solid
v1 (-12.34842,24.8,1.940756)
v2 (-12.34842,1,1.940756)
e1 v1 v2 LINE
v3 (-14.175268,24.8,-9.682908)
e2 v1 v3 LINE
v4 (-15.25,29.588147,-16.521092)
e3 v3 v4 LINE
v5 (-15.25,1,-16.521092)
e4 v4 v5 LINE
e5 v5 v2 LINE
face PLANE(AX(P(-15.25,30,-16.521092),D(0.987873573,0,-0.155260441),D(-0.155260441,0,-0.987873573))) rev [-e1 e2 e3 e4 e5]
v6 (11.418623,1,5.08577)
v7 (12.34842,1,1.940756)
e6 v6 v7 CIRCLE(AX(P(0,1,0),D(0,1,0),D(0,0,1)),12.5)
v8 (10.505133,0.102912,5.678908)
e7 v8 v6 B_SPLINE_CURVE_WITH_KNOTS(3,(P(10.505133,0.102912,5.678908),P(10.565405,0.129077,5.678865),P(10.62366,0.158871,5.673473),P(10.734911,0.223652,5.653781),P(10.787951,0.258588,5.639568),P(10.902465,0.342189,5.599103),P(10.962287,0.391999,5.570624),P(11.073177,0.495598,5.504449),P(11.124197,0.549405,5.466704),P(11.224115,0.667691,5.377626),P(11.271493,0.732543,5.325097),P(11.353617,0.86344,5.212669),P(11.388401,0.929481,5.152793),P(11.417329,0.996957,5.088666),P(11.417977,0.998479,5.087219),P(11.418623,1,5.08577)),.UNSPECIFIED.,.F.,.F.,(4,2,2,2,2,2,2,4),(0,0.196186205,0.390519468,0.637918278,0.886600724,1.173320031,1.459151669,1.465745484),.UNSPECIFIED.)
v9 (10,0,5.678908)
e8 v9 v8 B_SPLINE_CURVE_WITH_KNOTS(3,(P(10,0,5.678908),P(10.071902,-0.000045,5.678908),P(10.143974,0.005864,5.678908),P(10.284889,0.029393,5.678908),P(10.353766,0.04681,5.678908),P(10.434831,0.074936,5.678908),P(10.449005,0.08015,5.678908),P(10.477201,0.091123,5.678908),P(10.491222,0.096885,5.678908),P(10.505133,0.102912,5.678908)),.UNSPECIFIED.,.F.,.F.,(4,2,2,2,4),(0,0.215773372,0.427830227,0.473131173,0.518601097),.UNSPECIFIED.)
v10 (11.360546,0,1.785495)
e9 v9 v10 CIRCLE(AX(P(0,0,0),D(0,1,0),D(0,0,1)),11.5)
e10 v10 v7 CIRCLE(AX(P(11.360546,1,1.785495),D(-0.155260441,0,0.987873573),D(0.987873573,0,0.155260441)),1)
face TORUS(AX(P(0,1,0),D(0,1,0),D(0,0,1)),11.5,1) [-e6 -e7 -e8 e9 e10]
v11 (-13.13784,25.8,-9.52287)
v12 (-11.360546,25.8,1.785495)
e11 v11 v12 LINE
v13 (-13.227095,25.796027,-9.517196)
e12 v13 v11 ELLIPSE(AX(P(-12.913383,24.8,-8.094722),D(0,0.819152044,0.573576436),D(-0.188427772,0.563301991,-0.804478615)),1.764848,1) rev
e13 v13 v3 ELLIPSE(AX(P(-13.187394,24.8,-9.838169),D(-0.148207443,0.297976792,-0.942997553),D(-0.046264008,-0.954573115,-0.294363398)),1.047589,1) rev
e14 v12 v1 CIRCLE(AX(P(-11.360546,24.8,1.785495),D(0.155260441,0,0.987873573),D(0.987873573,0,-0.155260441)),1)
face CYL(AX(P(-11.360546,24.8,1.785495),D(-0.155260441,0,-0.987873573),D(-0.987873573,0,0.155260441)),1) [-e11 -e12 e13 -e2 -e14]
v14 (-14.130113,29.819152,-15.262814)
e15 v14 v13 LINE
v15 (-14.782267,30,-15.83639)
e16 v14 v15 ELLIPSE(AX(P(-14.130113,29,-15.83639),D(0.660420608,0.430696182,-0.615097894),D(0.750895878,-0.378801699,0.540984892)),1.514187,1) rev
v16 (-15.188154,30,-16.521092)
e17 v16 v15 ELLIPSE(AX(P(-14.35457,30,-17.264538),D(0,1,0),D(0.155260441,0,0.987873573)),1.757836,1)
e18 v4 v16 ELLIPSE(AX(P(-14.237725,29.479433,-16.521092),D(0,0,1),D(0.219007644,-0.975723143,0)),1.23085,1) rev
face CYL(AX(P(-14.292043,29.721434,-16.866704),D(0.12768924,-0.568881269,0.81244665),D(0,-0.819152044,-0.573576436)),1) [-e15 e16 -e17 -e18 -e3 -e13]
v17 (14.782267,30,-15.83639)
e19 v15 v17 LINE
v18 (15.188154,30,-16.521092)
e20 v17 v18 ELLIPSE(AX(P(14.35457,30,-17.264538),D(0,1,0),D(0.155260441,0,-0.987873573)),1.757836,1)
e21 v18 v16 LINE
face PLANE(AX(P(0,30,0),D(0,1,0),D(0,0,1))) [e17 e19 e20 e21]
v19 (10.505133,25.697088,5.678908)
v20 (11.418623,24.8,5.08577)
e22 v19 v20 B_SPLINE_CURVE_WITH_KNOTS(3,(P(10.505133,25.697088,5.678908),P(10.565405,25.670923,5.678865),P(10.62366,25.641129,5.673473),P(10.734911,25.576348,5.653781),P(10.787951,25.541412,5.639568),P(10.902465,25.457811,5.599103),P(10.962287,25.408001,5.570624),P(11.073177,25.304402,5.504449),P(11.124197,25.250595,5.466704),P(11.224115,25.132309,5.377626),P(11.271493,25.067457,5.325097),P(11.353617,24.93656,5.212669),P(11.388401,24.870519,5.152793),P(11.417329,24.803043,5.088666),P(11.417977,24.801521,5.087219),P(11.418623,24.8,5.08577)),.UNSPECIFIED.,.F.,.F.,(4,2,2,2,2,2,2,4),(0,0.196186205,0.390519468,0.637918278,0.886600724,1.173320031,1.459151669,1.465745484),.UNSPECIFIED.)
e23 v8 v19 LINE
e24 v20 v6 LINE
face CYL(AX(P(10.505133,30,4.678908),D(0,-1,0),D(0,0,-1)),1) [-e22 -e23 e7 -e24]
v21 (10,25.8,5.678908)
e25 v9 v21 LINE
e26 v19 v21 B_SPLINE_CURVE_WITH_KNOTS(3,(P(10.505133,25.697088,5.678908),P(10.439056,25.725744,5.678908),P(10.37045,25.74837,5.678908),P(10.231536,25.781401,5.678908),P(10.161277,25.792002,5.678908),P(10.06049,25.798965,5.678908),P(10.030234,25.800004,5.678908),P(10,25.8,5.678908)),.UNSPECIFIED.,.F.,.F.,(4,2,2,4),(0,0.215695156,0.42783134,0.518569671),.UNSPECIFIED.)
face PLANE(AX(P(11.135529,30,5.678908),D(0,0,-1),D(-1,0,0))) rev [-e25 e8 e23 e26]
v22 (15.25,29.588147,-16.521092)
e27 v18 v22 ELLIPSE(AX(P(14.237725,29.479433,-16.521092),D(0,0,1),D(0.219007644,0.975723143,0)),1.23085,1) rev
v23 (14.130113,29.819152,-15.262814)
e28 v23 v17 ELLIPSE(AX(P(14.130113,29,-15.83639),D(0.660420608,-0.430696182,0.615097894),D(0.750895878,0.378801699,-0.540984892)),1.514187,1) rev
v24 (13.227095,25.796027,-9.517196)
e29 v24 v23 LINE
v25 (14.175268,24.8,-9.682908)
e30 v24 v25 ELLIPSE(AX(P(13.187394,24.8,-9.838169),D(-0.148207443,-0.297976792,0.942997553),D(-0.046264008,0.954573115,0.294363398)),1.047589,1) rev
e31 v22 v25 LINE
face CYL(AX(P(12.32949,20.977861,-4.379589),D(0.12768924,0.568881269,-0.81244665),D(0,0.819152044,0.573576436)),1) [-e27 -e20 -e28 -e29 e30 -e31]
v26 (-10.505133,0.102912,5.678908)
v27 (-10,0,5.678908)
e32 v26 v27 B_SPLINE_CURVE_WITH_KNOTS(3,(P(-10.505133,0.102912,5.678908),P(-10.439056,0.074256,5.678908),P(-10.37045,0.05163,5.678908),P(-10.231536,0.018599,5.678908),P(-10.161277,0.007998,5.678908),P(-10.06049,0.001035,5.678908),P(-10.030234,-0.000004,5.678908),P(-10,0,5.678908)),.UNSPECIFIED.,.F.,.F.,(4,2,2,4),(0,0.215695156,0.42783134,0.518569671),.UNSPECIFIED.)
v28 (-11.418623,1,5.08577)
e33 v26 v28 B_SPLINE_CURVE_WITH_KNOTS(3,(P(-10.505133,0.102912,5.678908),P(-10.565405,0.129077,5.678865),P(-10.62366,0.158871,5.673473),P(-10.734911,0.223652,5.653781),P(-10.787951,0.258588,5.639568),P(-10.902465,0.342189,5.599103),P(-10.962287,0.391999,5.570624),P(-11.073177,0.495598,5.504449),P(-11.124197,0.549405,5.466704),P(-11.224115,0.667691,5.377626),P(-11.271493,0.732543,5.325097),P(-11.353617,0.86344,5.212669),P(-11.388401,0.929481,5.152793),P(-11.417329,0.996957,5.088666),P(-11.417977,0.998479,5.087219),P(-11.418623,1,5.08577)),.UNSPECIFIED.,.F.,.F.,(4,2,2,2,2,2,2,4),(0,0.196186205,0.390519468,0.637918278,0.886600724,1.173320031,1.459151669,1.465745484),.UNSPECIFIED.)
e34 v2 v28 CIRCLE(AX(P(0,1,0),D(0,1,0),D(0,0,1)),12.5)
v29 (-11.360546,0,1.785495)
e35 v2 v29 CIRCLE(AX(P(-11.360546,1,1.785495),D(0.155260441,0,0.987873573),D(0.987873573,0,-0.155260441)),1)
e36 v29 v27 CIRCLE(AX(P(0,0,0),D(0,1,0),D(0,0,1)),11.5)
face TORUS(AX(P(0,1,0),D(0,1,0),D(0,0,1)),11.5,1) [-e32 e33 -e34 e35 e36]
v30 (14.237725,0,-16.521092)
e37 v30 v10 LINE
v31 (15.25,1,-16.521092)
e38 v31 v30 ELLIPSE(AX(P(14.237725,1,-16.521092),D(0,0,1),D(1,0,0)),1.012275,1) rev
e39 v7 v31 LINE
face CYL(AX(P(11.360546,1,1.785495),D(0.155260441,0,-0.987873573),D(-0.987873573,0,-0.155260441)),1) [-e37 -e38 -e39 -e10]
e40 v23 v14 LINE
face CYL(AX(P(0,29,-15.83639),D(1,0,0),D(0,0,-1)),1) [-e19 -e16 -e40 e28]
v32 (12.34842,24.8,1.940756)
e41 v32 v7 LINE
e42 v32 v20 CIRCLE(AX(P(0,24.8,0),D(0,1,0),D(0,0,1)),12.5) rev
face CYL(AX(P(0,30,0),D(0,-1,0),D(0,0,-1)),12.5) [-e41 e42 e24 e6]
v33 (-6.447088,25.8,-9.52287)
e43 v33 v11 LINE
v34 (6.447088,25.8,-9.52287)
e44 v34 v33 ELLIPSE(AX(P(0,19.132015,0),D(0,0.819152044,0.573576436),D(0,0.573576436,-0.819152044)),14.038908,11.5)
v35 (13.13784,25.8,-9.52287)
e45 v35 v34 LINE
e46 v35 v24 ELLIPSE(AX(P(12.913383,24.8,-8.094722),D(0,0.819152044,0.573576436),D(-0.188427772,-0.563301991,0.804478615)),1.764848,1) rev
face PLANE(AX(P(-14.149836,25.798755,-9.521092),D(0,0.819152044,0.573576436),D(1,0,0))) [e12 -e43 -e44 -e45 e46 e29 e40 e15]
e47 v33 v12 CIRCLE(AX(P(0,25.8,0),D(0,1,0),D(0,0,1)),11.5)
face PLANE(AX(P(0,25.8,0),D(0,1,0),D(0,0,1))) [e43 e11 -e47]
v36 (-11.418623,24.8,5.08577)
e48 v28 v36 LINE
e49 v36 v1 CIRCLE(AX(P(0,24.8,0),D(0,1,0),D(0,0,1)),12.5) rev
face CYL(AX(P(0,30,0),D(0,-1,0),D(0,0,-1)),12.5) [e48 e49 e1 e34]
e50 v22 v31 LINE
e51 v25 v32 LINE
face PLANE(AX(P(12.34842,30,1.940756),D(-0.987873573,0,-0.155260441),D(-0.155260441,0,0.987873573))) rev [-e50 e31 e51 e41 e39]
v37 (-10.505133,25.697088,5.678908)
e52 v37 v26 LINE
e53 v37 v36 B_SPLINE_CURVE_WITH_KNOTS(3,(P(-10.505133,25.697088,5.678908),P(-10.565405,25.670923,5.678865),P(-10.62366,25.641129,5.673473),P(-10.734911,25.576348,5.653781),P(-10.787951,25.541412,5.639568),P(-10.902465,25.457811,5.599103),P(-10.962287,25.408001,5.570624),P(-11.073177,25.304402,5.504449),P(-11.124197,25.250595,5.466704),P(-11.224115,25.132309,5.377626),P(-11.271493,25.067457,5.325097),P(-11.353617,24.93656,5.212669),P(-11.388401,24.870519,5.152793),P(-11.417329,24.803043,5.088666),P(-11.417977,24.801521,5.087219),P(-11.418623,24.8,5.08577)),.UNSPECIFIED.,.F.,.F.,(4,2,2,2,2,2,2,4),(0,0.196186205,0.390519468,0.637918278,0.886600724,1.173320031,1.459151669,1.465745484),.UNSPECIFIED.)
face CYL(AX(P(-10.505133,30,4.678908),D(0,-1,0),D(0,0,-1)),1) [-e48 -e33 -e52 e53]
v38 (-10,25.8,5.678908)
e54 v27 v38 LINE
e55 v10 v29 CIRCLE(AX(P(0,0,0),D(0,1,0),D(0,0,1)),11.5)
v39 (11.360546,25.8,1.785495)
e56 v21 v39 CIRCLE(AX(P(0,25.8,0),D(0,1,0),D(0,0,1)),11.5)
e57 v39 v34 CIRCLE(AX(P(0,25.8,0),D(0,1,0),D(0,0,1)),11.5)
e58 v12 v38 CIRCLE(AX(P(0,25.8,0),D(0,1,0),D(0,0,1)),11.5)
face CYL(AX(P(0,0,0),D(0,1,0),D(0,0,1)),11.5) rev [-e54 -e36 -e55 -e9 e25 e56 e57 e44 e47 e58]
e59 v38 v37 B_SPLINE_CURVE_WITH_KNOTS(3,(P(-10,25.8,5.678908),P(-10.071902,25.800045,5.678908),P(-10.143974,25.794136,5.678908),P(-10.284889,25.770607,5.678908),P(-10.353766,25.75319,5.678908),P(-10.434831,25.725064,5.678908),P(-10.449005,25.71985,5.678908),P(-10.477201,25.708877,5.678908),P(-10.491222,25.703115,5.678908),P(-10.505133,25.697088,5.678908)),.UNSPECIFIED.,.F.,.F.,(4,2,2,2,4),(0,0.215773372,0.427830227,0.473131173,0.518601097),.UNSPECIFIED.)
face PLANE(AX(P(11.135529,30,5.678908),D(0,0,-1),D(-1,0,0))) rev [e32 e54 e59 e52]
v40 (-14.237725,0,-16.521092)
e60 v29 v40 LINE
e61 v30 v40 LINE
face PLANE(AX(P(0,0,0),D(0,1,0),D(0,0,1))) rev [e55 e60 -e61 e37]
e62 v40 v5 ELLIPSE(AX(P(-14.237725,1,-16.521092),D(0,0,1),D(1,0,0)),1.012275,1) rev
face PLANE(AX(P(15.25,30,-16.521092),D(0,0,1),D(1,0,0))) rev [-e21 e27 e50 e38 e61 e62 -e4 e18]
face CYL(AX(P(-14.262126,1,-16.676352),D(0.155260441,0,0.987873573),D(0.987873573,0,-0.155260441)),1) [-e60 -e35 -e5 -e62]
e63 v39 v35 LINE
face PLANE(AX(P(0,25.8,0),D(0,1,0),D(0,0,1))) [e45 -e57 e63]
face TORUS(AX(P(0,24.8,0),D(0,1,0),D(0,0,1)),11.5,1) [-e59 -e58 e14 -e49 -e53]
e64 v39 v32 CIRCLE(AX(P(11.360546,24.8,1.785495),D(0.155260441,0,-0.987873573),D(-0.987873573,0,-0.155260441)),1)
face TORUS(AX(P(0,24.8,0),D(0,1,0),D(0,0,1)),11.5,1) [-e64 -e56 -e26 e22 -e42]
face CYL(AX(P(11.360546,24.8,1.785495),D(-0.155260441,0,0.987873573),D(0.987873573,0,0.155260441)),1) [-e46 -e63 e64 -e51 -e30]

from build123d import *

# Parameters (mm, degrees)
SALIENTE_EXTRUIR1_DEPTH = 30
CORTAR_EXTRUIR1_START   = -4.2
CORTAR_EXTRUIR1_DEPTH   = 4.2
CHAFL_N1_SIZE           = 4.201245229
CHAFL_N1_SIZE_2         = 6
CORTAR_EXTRUIR2_DEPTH   = 38.490118291
REDONDEO1_R             = 1


with BuildPart() as part:
    # Croquis1 → Saliente-Extruir1 (new body)
    with BuildSketch(Plane(origin=(0, 0, 0), x_dir=(1, 0, 0), z_dir=(0, 1, 0))):
        with BuildLine():
            Line((11.135528726, -5.678908346), (-11.135528726, -5.678908346))
            ThreePointArc((-11.135528726, -5.678908346), (-11.889802545, -3.857796709), (-12.348419657, -1.940755517))
            Line((-12.348419657, -1.940755517), (-15.25, 16.521091654))
            Line((-15.25, 16.521091654), (15.25, 16.521091654))
            Line((15.25, 16.521091654), (12.348419657, -1.940755517))
            ThreePointArc((12.348419657, -1.940755517), (11.889802545, -3.857796709), (11.135528726, -5.678908346))
        make_face()
    extrude(amount=SALIENTE_EXTRUIR1_DEPTH)

    # Croquis4 → Cortar-Extruir1 (cut)
    with BuildSketch(Plane(origin=(0, 30, 0), x_dir=(1, 0, 0), z_dir=(0, 1, 0)).offset(CORTAR_EXTRUIR1_START)):
        with BuildLine():
            Line((-14.14983585, 9.521091654), (14.14983585, 9.521091654))
            Line((14.14983585, 9.521091654), (12.348419657, -1.940755517))
            ThreePointArc((12.348419657, -1.940755517), (11.889802545, -3.857796709), (11.135528726, -5.678908346))
            Line((11.135528726, -5.678908346), (-11.135528726, -5.678908346))
            ThreePointArc((-11.135528726, -5.678908346), (-11.889802545, -3.857796709), (-12.348419657, -1.940755517))
            Line((-12.348419657, -1.940755517), (-14.14983585, 9.521091654))
        make_face()
    extrude(amount=CORTAR_EXTRUIR1_DEPTH, mode=Mode.SUBTRACT)

    # Chaflán1
    # the kernel refuses this chamfer: 6, 4.201245229 mm, written as the material it takes off along each edge
    with BuildSketch(Plane(origin=(-29.645149232, 30, -9.521091654), x_dir=(0, -0.9989750717851553, 0.04526373771402067), z_dir=(1, 0, 0))) as chafl_n1_piece_1_section:
        Polygon((CHAFL_N1_SIZE * 0.998975071847, CHAFL_N1_SIZE * 0.0452637377168), (-CHAFL_N1_SIZE_2 * 0.045263737714, CHAFL_N1_SIZE_2 * 0.998975071785), (0, 0), align=None)
    chafl_n1_piece_1 = extrude(amount=59.290298463, mode=Mode.PRIVATE)
    chafl_n1_piece_1 = split(chafl_n1_piece_1, bisect_by=Plane(origin=(0, 25.8, -11.524605635), z_dir=(0, 1, 0)), keep=Keep.TOP, mode=Mode.PRIVATE)
    add(chafl_n1_piece_1, mode=Mode.SUBTRACT)

    # Croquis5 → Cortar-Extruir2 (cut, through all)
    with BuildSketch(Plane(origin=(0, 30, 0), x_dir=(1, 0, 0), z_dir=(0, 1, 0))):
        with BuildLine():
            ThreePointArc((11.5, 0), (-2.936835031, 11.118677979), (-10, -5.678908346))
            Line((-10, -5.678908346), (10, -5.678908346))
            ThreePointArc((10, -5.678908346), (11.118677979, -2.936835031), (11.5, 0))
        make_face()
        with BuildLine():
            Line((10, -5.678908346), (-10, -5.678908346))
            ThreePointArc((-10, -5.678908346), (0, -11.5), (10, -5.678908346))
        make_face()
    extrude(amount=-CORTAR_EXTRUIR2_DEPTH, mode=Mode.SUBTRACT)

    # Redondeo1
    # the kernel refuses this fillet: 1 mm, written as the material it takes off along each edge
    with BuildSketch(Plane(origin=(11.135528726, 0, 5.678908346), x_dir=(0.43073600418276364, 0, -0.9024779746346534), z_dir=(0, 1, 0))) as redondeo1_piece_1:
        with BuildLine():
            CenterArc((0.630943784, 0.999654376), REDONDEO1_R, 205.514277886, 65.992163004)
            Line((-0.27153419, 0.568918372), (-0.28958375, 0.560303652))
            Line((-0.28958375, 0.560303652), (-0.018049559, -0.00861472))
            Line((-0.018049559, -0.00861472), (-0.000525786, -0.019993088))
            ThreePointArc((-0.000525786, -0.019993088), (0.328616554, -0.0243203), (0.657758895, -0.019993088))
            Line((0.657758895, -0.019993088), (0.657233109, 0))
        make_face()
    extrude(amount=25.8, mode=Mode.SUBTRACT)
    with BuildSketch(Plane(origin=(-11.135528726, 0, 5.678908346), x_dir=(-0.43073600418276736, 0, -0.9024779746346517), z_dir=(0, 1, 0))) as redondeo1_piece_2:
        with BuildLine():
            CenterArc((0.630943784, -0.999654376), REDONDEO1_R, 88.493559111, 65.992163004)
            Line((-0.27153419, -0.568918372), (-0.28958375, -0.560303652))
            Line((-0.28958375, -0.560303652), (-0.018049559, 0.00861472))
            Line((-0.018049559, 0.00861472), (-0.000525786, 0.019993088))
            ThreePointArc((-0.000525786, 0.019993088), (0.328616554, 0.0243203), (0.657758895, 0.019993088))
            Line((0.657758895, 0.019993088), (0.657233109, 0))
        make_face()
    extrude(amount=25.8, mode=Mode.SUBTRACT)
    with BuildSketch(Plane(origin=(-15.881080665, 30, -15.521091654), x_dir=(0, -0.573576436351271, 0.8191520442888343), z_dir=(1, 0, 0))) as redondeo1_piece_3_section:
        with BuildLine():
            CenterArc((REDONDEO1_R * 0.315298788879, REDONDEO1_R), REDONDEO1_R, 235, 35)
            Line((-REDONDEO1_R * 0.258277647472, REDONDEO1_R * 0.180847955711), (-REDONDEO1_R * 0.269749176199, REDONDEO1_R * 0.164464914825))
            Line((-REDONDEO1_R * 0.269749176199, REDONDEO1_R * 0.164464914825), (-REDONDEO1_R * 0.00630597577758, -REDONDEO1_R * 0.02))
            Line((-REDONDEO1_R * 0.00630597577758, -REDONDEO1_R * 0.02), (REDONDEO1_R * 0.315298788879, -REDONDEO1_R * 0.02))
            Line((REDONDEO1_R * 0.315298788879, -REDONDEO1_R * 0.02), (REDONDEO1_R * 0.315298788879, 0))
        make_face()
    redondeo1_piece_3 = extrude(amount=31.76216133, mode=Mode.PRIVATE)
    redondeo1_piece_3 = split(redondeo1_piece_3, bisect_by=Plane(origin=(14.730786778, 29.963938904, -13.217500501), z_dir=(-0.9878735725575741, 0, -0.1552604413311243)), keep=Keep.TOP, mode=Mode.PRIVATE)
    redondeo1_piece_3 = split(redondeo1_piece_3, bisect_by=Plane(origin=(-14.730786778, 29.963938904, -13.217500501), z_dir=(0.9878735725575741, 0, -0.1552604413311243)), keep=Keep.TOP, mode=Mode.PRIVATE)
    add(redondeo1_piece_3, mode=Mode.SUBTRACT)
    with BuildSketch(Plane(origin=(0, 0, 0), x_dir=(-0.7828247498801871, 0, 0.622242244608177), z_dir=(0.622242244608177, 0, 0.7828247498801871))) as redondeo1_piece_4_section:
        with BuildLine():
            CenterArc((12.5 - REDONDEO1_R, -REDONDEO1_R), REDONDEO1_R, 0, 90)
            Line((12.5, -REDONDEO1_R), (12.5 + REDONDEO1_R * 0.02, -REDONDEO1_R))
            Line((12.5 + REDONDEO1_R * 0.02, -REDONDEO1_R), (12.5 + REDONDEO1_R * 0.02, REDONDEO1_R * 0.02))
            Line((12.5 + REDONDEO1_R * 0.02, REDONDEO1_R * 0.02), (12.5 - REDONDEO1_R, REDONDEO1_R * 0.02))
            Line((12.5 - REDONDEO1_R, REDONDEO1_R * 0.02), (12.5 - REDONDEO1_R, 0))
        make_face()
    redondeo1_piece_4 = revolve(axis=Axis((0, 0, 0), (0, -1, 0)), revolution_arc=29.548159275, mode=Mode.PRIVATE)
    redondeo1_piece_4 = split(redondeo1_piece_4, bisect_by=Plane(origin=(-11.602574927, 0.225035128, 5.678908346), z_dir=(0, 0, -1)), keep=Keep.TOP, mode=Mode.PRIVATE)
    add(redondeo1_piece_4, mode=Mode.SUBTRACT)
    with BuildSketch(Plane(origin=(0, 25.8, 0), x_dir=(-0.7828247498801902, 0, 0.6222422446081731), z_dir=(0.6222422446081731, 0, 0.7828247498801902))) as redondeo1_piece_5_section:
        with BuildLine():
            CenterArc((12.5 - REDONDEO1_R, REDONDEO1_R), REDONDEO1_R, 270, 90)
            Line((12.5 - REDONDEO1_R, 0), (12.5 - REDONDEO1_R, -REDONDEO1_R * 0.02))
            Line((12.5 - REDONDEO1_R, -REDONDEO1_R * 0.02), (12.5 + REDONDEO1_R * 0.02, -REDONDEO1_R * 0.02))
            Line((12.5 + REDONDEO1_R * 0.02, -REDONDEO1_R * 0.02), (12.5 + REDONDEO1_R * 0.02, REDONDEO1_R))
            Line((12.5 + REDONDEO1_R * 0.02, REDONDEO1_R), (12.5, REDONDEO1_R))
        make_face()
    redondeo1_piece_5 = revolve(axis=Axis((0, 25.8, 0), (0, -1, 0)), revolution_arc=29.548159275, mode=Mode.PRIVATE)
    redondeo1_piece_5 = split(redondeo1_piece_5, bisect_by=Plane(origin=(-11.60257492, 25.57496487, 5.678908346), z_dir=(0, 0, -1)), keep=Keep.TOP, mode=Mode.PRIVATE)
    add(redondeo1_piece_5, mode=Mode.SUBTRACT)
    with BuildSketch(Plane(origin=(0, 0, 0), x_dir=(0.9878735725575738, 0, 0.1552604413311257), z_dir=(0.1552604413311257, 0, -0.9878735725575738))) as redondeo1_piece_6_section:
        with BuildLine():
            CenterArc((12.5 - REDONDEO1_R, -REDONDEO1_R), REDONDEO1_R, 0, 90)
            Line((12.5 - REDONDEO1_R, 0), (12.5 - REDONDEO1_R, REDONDEO1_R * 0.02))
            Line((12.5 - REDONDEO1_R, REDONDEO1_R * 0.02), (12.5 + REDONDEO1_R * 0.02, REDONDEO1_R * 0.02))
            Line((12.5 + REDONDEO1_R * 0.02, REDONDEO1_R * 0.02), (12.5 + REDONDEO1_R * 0.02, -REDONDEO1_R))
            Line((12.5 + REDONDEO1_R * 0.02, -REDONDEO1_R), (12.5, -REDONDEO1_R))
        make_face()
    redondeo1_piece_6 = revolve(axis=Axis((0, 0, 0), (0, -1, 0)), revolution_arc=29.548159275, mode=Mode.PRIVATE)
    redondeo1_piece_6 = split(redondeo1_piece_6, bisect_by=Plane(origin=(11.602574265, 0.22503504, 5.678908346), z_dir=(0, 0, -1)), keep=Keep.TOP, mode=Mode.PRIVATE)
    add(redondeo1_piece_6, mode=Mode.SUBTRACT)
    with BuildSketch(Plane(origin=(0, 25.8, 0), x_dir=(0.9878735725575738, 0, 0.155260441331126), z_dir=(0.155260441331126, 0, -0.9878735725575738))) as redondeo1_piece_7_section:
        with BuildLine():
            CenterArc((12.5 - REDONDEO1_R, REDONDEO1_R), REDONDEO1_R, 270, 90)
            Line((12.5 - REDONDEO1_R, 0), (12.5 - REDONDEO1_R, -REDONDEO1_R * 0.02))
            Line((12.5 - REDONDEO1_R, -REDONDEO1_R * 0.02), (12.5 + REDONDEO1_R * 0.02, -REDONDEO1_R * 0.02))
            Line((12.5 + REDONDEO1_R * 0.02, -REDONDEO1_R * 0.02), (12.5 + REDONDEO1_R * 0.02, REDONDEO1_R))
            Line((12.5 + REDONDEO1_R * 0.02, REDONDEO1_R), (12.5, REDONDEO1_R))
        make_face()
    redondeo1_piece_7 = revolve(axis=Axis((0, 25.8, 0), (0, -1, 0)), revolution_arc=29.548159275, mode=Mode.PRIVATE)
    redondeo1_piece_7 = split(redondeo1_piece_7, bisect_by=Plane(origin=(11.602574265, 25.57496496, 5.678908346), z_dir=(0, 0, -1)), keep=Keep.TOP, mode=Mode.PRIVATE)
    add(redondeo1_piece_7, mode=Mode.SUBTRACT)
    with BuildSketch(Plane(origin=(-12.348419657, 0, 1.940755517), x_dir=(0.987873572557574, 0, -0.15526044133112427), z_dir=(-0.1552604413311243, 0, -0.9878735725575741))) as redondeo1_piece_8_section:
        with BuildLine():
            CenterArc((REDONDEO1_R, -REDONDEO1_R), REDONDEO1_R, 90, 90)
            Line((0, -REDONDEO1_R), (-REDONDEO1_R * 0.02, -REDONDEO1_R))
            Line((-REDONDEO1_R * 0.02, -REDONDEO1_R), (-REDONDEO1_R * 0.02, REDONDEO1_R * 0.02))
            Line((-REDONDEO1_R * 0.02, REDONDEO1_R * 0.02), (REDONDEO1_R, REDONDEO1_R * 0.02))
            Line((REDONDEO1_R, REDONDEO1_R * 0.02), (REDONDEO1_R, 0))
        make_face()
    redondeo1_piece_8 = extrude(amount=21.188471565, mode=Mode.PRIVATE)
    redondeo1_piece_8 = split(redondeo1_piece_8, bisect_by=Plane(origin=(-13.573189498, 0.22662646, -16.521091654), z_dir=(0, 0, 1)), keep=Keep.TOP, mode=Mode.PRIVATE)
    add(redondeo1_piece_8, mode=Mode.SUBTRACT)
    with BuildSketch(Plane(origin=(-14.538266453, 25.8, -11.992553957), x_dir=(0, -1, 0), z_dir=(0.15526044133112413, 0, 0.9878735725575741))) as redondeo1_piece_9_section:
        with BuildLine():
            CenterArc((REDONDEO1_R, REDONDEO1_R), REDONDEO1_R, 180, 90)
            Line((0, REDONDEO1_R), (-REDONDEO1_R * 0.02, REDONDEO1_R))
            Line((-REDONDEO1_R * 0.02, REDONDEO1_R), (-REDONDEO1_R * 0.02, -REDONDEO1_R * 0.02))
            Line((-REDONDEO1_R * 0.02, -REDONDEO1_R * 0.02), (REDONDEO1_R, -REDONDEO1_R * 0.02))
            Line((REDONDEO1_R, -REDONDEO1_R * 0.02), (REDONDEO1_R, 0))
        make_face()
    redondeo1_piece_9 = extrude(amount=14.104344788, mode=Mode.PRIVATE)
    redondeo1_piece_9 = split(redondeo1_piece_9, bisect_by=Plane(origin=(-12.995193868, 22.9685698, -5.47916863), z_dir=(0, 0.8191520442888341, 0.5735764363512712)), keep=Keep.TOP, mode=Mode.PRIVATE)
    add(redondeo1_piece_9, mode=Mode.SUBTRACT)
    with BuildSketch(Plane(origin=(15.638151103, 0, -18.990775586), x_dir=(-0.987873572557574, 0, -0.1552604413311243), z_dir=(-0.1552604413311243, 0, 0.9878735725575741))) as redondeo1_piece_10_section:
        with BuildLine():
            CenterArc((REDONDEO1_R, -REDONDEO1_R), REDONDEO1_R, 90, 90)
            Line((0, -REDONDEO1_R), (-REDONDEO1_R * 0.02, -REDONDEO1_R))
            Line((-REDONDEO1_R * 0.02, -REDONDEO1_R), (-REDONDEO1_R * 0.02, REDONDEO1_R * 0.02))
            Line((-REDONDEO1_R * 0.02, REDONDEO1_R * 0.02), (REDONDEO1_R, REDONDEO1_R * 0.02))
            Line((REDONDEO1_R, REDONDEO1_R * 0.02), (REDONDEO1_R, 0))
        make_face()
    redondeo1_piece_10 = extrude(amount=21.188471565, mode=Mode.PRIVATE)
    redondeo1_piece_10 = split(redondeo1_piece_10, bisect_by=Plane(origin=(13.573189498, 0.22662646, -16.521091654), z_dir=(0, 0, 1)), keep=Keep.TOP, mode=Mode.PRIVATE)
    add(redondeo1_piece_10, mode=Mode.SUBTRACT)
    with BuildSketch(Plane(origin=(12.348419657, 25.8, 1.940755517), x_dir=(-0.987873572557574, 0, -0.15526044133112424), z_dir=(0.15526044133112424, 0, -0.9878735725575741))) as redondeo1_piece_11_section:
        with BuildLine():
            CenterArc((REDONDEO1_R, -REDONDEO1_R), REDONDEO1_R, 90, 90)
            Line((0, -REDONDEO1_R), (-REDONDEO1_R * 0.02, -REDONDEO1_R))
            Line((-REDONDEO1_R * 0.02, -REDONDEO1_R), (-REDONDEO1_R * 0.02, REDONDEO1_R * 0.02))
            Line((-REDONDEO1_R * 0.02, REDONDEO1_R * 0.02), (REDONDEO1_R, REDONDEO1_R * 0.02))
            Line((REDONDEO1_R, REDONDEO1_R * 0.02), (REDONDEO1_R, 0))
        make_face()
    redondeo1_piece_11 = extrude(amount=14.104344788, mode=Mode.PRIVATE)
    redondeo1_piece_11 = split(redondeo1_piece_11, bisect_by=Plane(origin=(12.995193868, 22.9685698, -5.47916863), z_dir=(0, 0.8191520442888341, 0.5735764363512712)), keep=Keep.TOP, mode=Mode.PRIVATE)
    add(redondeo1_piece_11, mode=Mode.SUBTRACT)
    with BuildSketch(Plane(origin=(-13.858160269, 24.499281341, -7.665251265), x_dir=(-0.08832475689359706, -0.8224196627964561, -0.5619827715913099), z_dir=(-0.1276892398051722, 0.5688812690234787, -0.8124466504283305))) as redondeo1_piece_12_section:
        with BuildLine():
            CenterArc((REDONDEO1_R * 0.91458005738, -REDONDEO1_R), REDONDEO1_R, 90, 84.890828744)
            Line((-REDONDEO1_R * 0.0814467660832, -REDONDEO1_R * 0.910946269355), (-REDONDEO1_R * 0.101367302552, -REDONDEO1_R * 0.909165194742))
            Line((-REDONDEO1_R * 0.101367302552, -REDONDEO1_R * 0.909165194742), (-REDONDEO1_R * 0.0182916011476, REDONDEO1_R * 0.02))
            Line((-REDONDEO1_R * 0.0182916011476, REDONDEO1_R * 0.02), (REDONDEO1_R * 0.91458005738, REDONDEO1_R * 0.02))
            Line((REDONDEO1_R * 0.91458005738, REDONDEO1_R * 0.02), (REDONDEO1_R * 0.91458005738, 0))
        make_face()
    redondeo1_piece_12 = extrude(amount=11.955811676, mode=Mode.PRIVATE)
    redondeo1_piece_12 = split(redondeo1_piece_12, bisect_by=Plane(origin=(-14.470678042, 30, -12.878094062), z_dir=(0, -1, 0)), keep=Keep.TOP, mode=Mode.PRIVATE)
    redondeo1_piece_12 = split(redondeo1_piece_12, bisect_by=Plane(origin=(-14.470678042, 25.8, -12.878094062), z_dir=(0, 1, 0)), keep=Keep.TOP, mode=Mode.PRIVATE)
    add(redondeo1_piece_12, mode=Mode.SUBTRACT)
    with BuildSketch(Plane(origin=(15.384788774, 31.300718659, -17.378710415), x_dir=(0.08832475689359764, -0.8224196627964561, -0.5619827715913099), z_dir=(-0.1276892398051722, -0.5688812690234787, 0.8124466504283305))) as redondeo1_piece_13_section:
        with BuildLine():
            CenterArc((REDONDEO1_R * 0.91458005738, -REDONDEO1_R), REDONDEO1_R, 90, 84.890828744)
            Line((-REDONDEO1_R * 0.0814467660832, -REDONDEO1_R * 0.910946269355), (-REDONDEO1_R * 0.101367302553, -REDONDEO1_R * 0.909165194742))
            Line((-REDONDEO1_R * 0.101367302553, -REDONDEO1_R * 0.909165194742), (-REDONDEO1_R * 0.0182916011476, REDONDEO1_R * 0.02))
            Line((-REDONDEO1_R * 0.0182916011476, REDONDEO1_R * 0.02), (REDONDEO1_R * 0.91458005738, REDONDEO1_R * 0.02))
            Line((REDONDEO1_R * 0.91458005738, REDONDEO1_R * 0.02), (REDONDEO1_R * 0.91458005738, 0))
        make_face()
    redondeo1_piece_13 = extrude(amount=11.955811676, mode=Mode.PRIVATE)
    redondeo1_piece_13 = split(redondeo1_piece_13, bisect_by=Plane(origin=(14.470678042, 25.8, -12.878094062), z_dir=(0, 1, 0)), keep=Keep.TOP, mode=Mode.PRIVATE)
    redondeo1_piece_13 = split(redondeo1_piece_13, bisect_by=Plane(origin=(14.470678042, 30, -12.878094062), z_dir=(0, -1, 0)), keep=Keep.TOP, mode=Mode.PRIVATE)
    add(redondeo1_piece_13, mode=Mode.SUBTRACT)
    with BuildSketch(Plane(origin=(0, 0, 0), x_dir=(0.9878735725575738, 0, 0.1552604413311257), z_dir=(0.1552604413311257, 0, -0.9878735725575738))) as redondeo1_piece_14a_section:
        with BuildLine():
            CenterArc((12.5 - REDONDEO1_R, -REDONDEO1_R), REDONDEO1_R, 0, 90)
            Line((12.5 - REDONDEO1_R, 0), (12.5 - REDONDEO1_R, REDONDEO1_R * 0.02))
            Line((12.5 - REDONDEO1_R, REDONDEO1_R * 0.02), (12.5 + REDONDEO1_R * 0.02, REDONDEO1_R * 0.02))
            Line((12.5 + REDONDEO1_R * 0.02, REDONDEO1_R * 0.02), (12.5 + REDONDEO1_R * 0.02, -REDONDEO1_R))
            Line((12.5 + REDONDEO1_R * 0.02, -REDONDEO1_R), (12.5, -REDONDEO1_R))
        make_face()
    redondeo1_piece_14a = revolve(axis=Axis((0, 0, 0), (0, -1, 0)), revolution_arc=29.548159275, mode=Mode.PRIVATE)
    redondeo1_piece_14a = split(redondeo1_piece_14a, bisect_by=Plane(origin=(10.289138435, 0.234770185, 5.678908346), z_dir=(0, 0, 1)), keep=Keep.TOP, mode=Mode.PRIVATE)
    with BuildSketch(Plane(origin=(11.135528726, -1.643082772, 5.678908346), x_dir=(0.43073600418275976, 0, -0.9024779746346553), z_dir=(0, 1, 0))) as redondeo1_piece_14b_section:
        with BuildLine():
            CenterArc((0.630943784, 0.999654376), REDONDEO1_R, 205.514277886, 65.992163004)
            Line((-0.27153419, 0.568918372), (-0.28958375, 0.560303652))
            Line((-0.28958375, 0.560303652), (-0.018049559, -0.00861472))
            Line((-0.018049559, -0.00861472), (-0.000525786, -0.019993088))
            ThreePointArc((-0.000525786, -0.019993088), (0.328616554, -0.0243203), (0.657758895, -0.019993088))
            Line((0.657758895, -0.019993088), (0.657233109, 0))
        make_face()
    redondeo1_piece_14b = extrude(amount=27.443082772, mode=Mode.PRIVATE)
    redondeo1_piece_14b = split(redondeo1_piece_14b, bisect_by=Plane(origin=(11.06383799, 0, 5.549435466), z_dir=(0, -1, 0)), keep=Keep.TOP, mode=Mode.PRIVATE)
    redondeo1_piece_14 = redondeo1_piece_14a & redondeo1_piece_14b
    add(redondeo1_piece_14, mode=Mode.SUBTRACT)
    with BuildSketch(Plane(origin=(11.135528726, 0, 5.678908346), x_dir=(0.43073600418276364, 0, -0.9024779746346534), z_dir=(0, 1, 0))) as redondeo1_piece_15a_section:
        with BuildLine():
            CenterArc((0.630943784, 0.999654376), REDONDEO1_R, 205.514277886, 65.992163004)
            Line((-0.27153419, 0.568918372), (-0.28958375, 0.560303652))
            Line((-0.28958375, 0.560303652), (-0.018049559, -0.00861472))
            Line((-0.018049559, -0.00861472), (-0.000525786, -0.019993088))
            ThreePointArc((-0.000525786, -0.019993088), (0.328616554, -0.0243203), (0.657758895, -0.019993088))
            Line((0.657758895, -0.019993088), (0.657233109, 0))
        make_face()
    redondeo1_piece_15a = extrude(amount=27.443082772, mode=Mode.PRIVATE)
    redondeo1_piece_15a = split(redondeo1_piece_15a, bisect_by=Plane(origin=(11.06383799, 25.8, 5.549435466), z_dir=(0, 1, 0)), keep=Keep.TOP, mode=Mode.PRIVATE)
    with BuildSketch(Plane(origin=(0, 25.8, 0), x_dir=(0.9878735725575738, 0, 0.155260441331126), z_dir=(0.155260441331126, 0, -0.9878735725575738))) as redondeo1_piece_15b_section:
        with BuildLine():
            CenterArc((12.5 - REDONDEO1_R, REDONDEO1_R), REDONDEO1_R, 270, 90)
            Line((12.5 - REDONDEO1_R, 0), (12.5 - REDONDEO1_R, -REDONDEO1_R * 0.02))
            Line((12.5 - REDONDEO1_R, -REDONDEO1_R * 0.02), (12.5 + REDONDEO1_R * 0.02, -REDONDEO1_R * 0.02))
            Line((12.5 + REDONDEO1_R * 0.02, -REDONDEO1_R * 0.02), (12.5 + REDONDEO1_R * 0.02, REDONDEO1_R))
            Line((12.5 + REDONDEO1_R * 0.02, REDONDEO1_R), (12.5, REDONDEO1_R))
        make_face()
    redondeo1_piece_15b = revolve(axis=Axis((0, 25.8, 0), (0, -1, 0)), revolution_arc=29.548159275, mode=Mode.PRIVATE)
    redondeo1_piece_15b = split(redondeo1_piece_15b, bisect_by=Plane(origin=(10.289138435, 25.565229815, 5.678908346), z_dir=(0, 0, 1)), keep=Keep.TOP, mode=Mode.PRIVATE)
    redondeo1_piece_15 = redondeo1_piece_15a & redondeo1_piece_15b
    add(redondeo1_piece_15, mode=Mode.SUBTRACT)
    with BuildSketch(Plane(origin=(0, 0, 0), x_dir=(-0.7828247498801871, 0, 0.622242244608177), z_dir=(0.622242244608177, 0, 0.7828247498801871))) as redondeo1_piece_16a_section:
        with BuildLine():
            CenterArc((12.5 - REDONDEO1_R, -REDONDEO1_R), REDONDEO1_R, 0, 90)
            Line((12.5, -REDONDEO1_R), (12.5 + REDONDEO1_R * 0.02, -REDONDEO1_R))
            Line((12.5 + REDONDEO1_R * 0.02, -REDONDEO1_R), (12.5 + REDONDEO1_R * 0.02, REDONDEO1_R * 0.02))
            Line((12.5 + REDONDEO1_R * 0.02, REDONDEO1_R * 0.02), (12.5 - REDONDEO1_R, REDONDEO1_R * 0.02))
            Line((12.5 - REDONDEO1_R, REDONDEO1_R * 0.02), (12.5 - REDONDEO1_R, 0))
        make_face()
    redondeo1_piece_16a = revolve(axis=Axis((0, 0, 0), (0, -1, 0)), revolution_arc=29.548159275, mode=Mode.PRIVATE)
    redondeo1_piece_16a = split(redondeo1_piece_16a, bisect_by=Plane(origin=(-10.289138153, 0.234770148, 5.678908346), z_dir=(0, 0, 1)), keep=Keep.TOP, mode=Mode.PRIVATE)
    with BuildSketch(Plane(origin=(-11.135528726, -1.643082772, 5.678908346), x_dir=(-0.43073600418276686, 0, -0.902477974634652), z_dir=(0, 1, 0))) as redondeo1_piece_16b_section:
        with BuildLine():
            CenterArc((0.630943784, -0.999654376), REDONDEO1_R, 88.493559111, 65.992163004)
            Line((-0.27153419, -0.568918372), (-0.28958375, -0.560303652))
            Line((-0.28958375, -0.560303652), (-0.018049559, 0.00861472))
            Line((-0.018049559, 0.00861472), (-0.000525786, 0.019993088))
            ThreePointArc((-0.000525786, 0.019993088), (0.328616554, 0.0243203), (0.657758895, 0.019993088))
            Line((0.657758895, 0.019993088), (0.657233109, 0))
        make_face()
    redondeo1_piece_16b = extrude(amount=27.443082772, mode=Mode.PRIVATE)
    redondeo1_piece_16b = split(redondeo1_piece_16b, bisect_by=Plane(origin=(-11.06383799, 0, 5.549435466), z_dir=(0, -1, 0)), keep=Keep.TOP, mode=Mode.PRIVATE)
    redondeo1_piece_16 = redondeo1_piece_16a & redondeo1_piece_16b
    add(redondeo1_piece_16, mode=Mode.SUBTRACT)
    with BuildSketch(Plane(origin=(0, 25.8, 0), x_dir=(-0.7828247498801902, 0, 0.6222422446081731), z_dir=(0.6222422446081731, 0, 0.7828247498801902))) as redondeo1_piece_17a_section:
        with BuildLine():
            CenterArc((12.5 - REDONDEO1_R, REDONDEO1_R), REDONDEO1_R, 270, 90)
            Line((12.5 - REDONDEO1_R, 0), (12.5 - REDONDEO1_R, -REDONDEO1_R * 0.02))
            Line((12.5 - REDONDEO1_R, -REDONDEO1_R * 0.02), (12.5 + REDONDEO1_R * 0.02, -REDONDEO1_R * 0.02))
            Line((12.5 + REDONDEO1_R * 0.02, -REDONDEO1_R * 0.02), (12.5 + REDONDEO1_R * 0.02, REDONDEO1_R))
            Line((12.5 + REDONDEO1_R * 0.02, REDONDEO1_R), (12.5, REDONDEO1_R))
        make_face()
    redondeo1_piece_17a = revolve(axis=Axis((0, 25.8, 0), (0, -1, 0)), revolution_arc=29.548159275, mode=Mode.PRIVATE)
    redondeo1_piece_17a = split(redondeo1_piece_17a, bisect_by=Plane(origin=(-10.289138154, 25.565229849, 5.678908346), z_dir=(0, 0, 1)), keep=Keep.TOP, mode=Mode.PRIVATE)
    with BuildSketch(Plane(origin=(-11.135528726, 0, 5.678908346), x_dir=(-0.43073600418276736, 0, -0.9024779746346517), z_dir=(0, 1, 0))) as redondeo1_piece_17b_section:
        with BuildLine():
            CenterArc((0.630943784, -0.999654376), REDONDEO1_R, 88.493559111, 65.992163004)
            Line((-0.27153419, -0.568918372), (-0.28958375, -0.560303652))
            Line((-0.28958375, -0.560303652), (-0.018049559, 0.00861472))
            Line((-0.018049559, 0.00861472), (-0.000525786, 0.019993088))
            ThreePointArc((-0.000525786, 0.019993088), (0.328616554, 0.0243203), (0.657758895, 0.019993088))
            Line((0.657758895, 0.019993088), (0.657233109, 0))
        make_face()
    redondeo1_piece_17b = extrude(amount=27.443082772, mode=Mode.PRIVATE)
    redondeo1_piece_17b = split(redondeo1_piece_17b, bisect_by=Plane(origin=(-11.06383799, 25.8, 5.549435466), z_dir=(0, 1, 0)), keep=Keep.TOP, mode=Mode.PRIVATE)
    redondeo1_piece_17 = redondeo1_piece_17a & redondeo1_piece_17b
    add(redondeo1_piece_17, mode=Mode.SUBTRACT)
    with BuildSketch(Plane(origin=(-13.858160269, 24.499281341, -7.665251265), x_dir=(-0.08832475689359706, -0.8224196627964561, -0.5619827715913099), z_dir=(-0.1276892398051722, 0.5688812690234787, -0.8124466504283305))) as redondeo1_piece_18a_section:
        with BuildLine():
            CenterArc((REDONDEO1_R * 0.91458005738, -REDONDEO1_R), REDONDEO1_R, 90, 84.890828744)
            Line((-REDONDEO1_R * 0.0814467660832, -REDONDEO1_R * 0.910946269355), (-REDONDEO1_R * 0.101367302552, -REDONDEO1_R * 0.909165194742))
            Line((-REDONDEO1_R * 0.101367302552, -REDONDEO1_R * 0.909165194742), (-REDONDEO1_R * 0.0182916011476, REDONDEO1_R * 0.02))
            Line((-REDONDEO1_R * 0.0182916011476, REDONDEO1_R * 0.02), (REDONDEO1_R * 0.91458005738, REDONDEO1_R * 0.02))
            Line((REDONDEO1_R * 0.91458005738, REDONDEO1_R * 0.02), (REDONDEO1_R * 0.91458005738, 0))
        make_face()
    redondeo1_piece_18a = extrude(amount=11.955811676, mode=Mode.PRIVATE)
    redondeo1_piece_18a = split(redondeo1_piece_18a, bisect_by=Plane(origin=(-15.046076432, 30, -16.662987381), z_dir=(0, 1, 0)), keep=Keep.TOP, mode=Mode.PRIVATE)
    with BuildSketch(Plane(origin=(-15.881080665, 30, -15.521091654), x_dir=(0, -0.573576436351271, 0.8191520442888343), z_dir=(1, 0, 0))) as redondeo1_piece_18b_section:
        with BuildLine():
            CenterArc((REDONDEO1_R * 0.315298788879, REDONDEO1_R), REDONDEO1_R, 235, 35)
            Line((-REDONDEO1_R * 0.258277647472, REDONDEO1_R * 0.180847955711), (-REDONDEO1_R * 0.269749176199, REDONDEO1_R * 0.164464914825))
            Line((-REDONDEO1_R * 0.269749176199, REDONDEO1_R * 0.164464914825), (-REDONDEO1_R * 0.00630597577758, -REDONDEO1_R * 0.02))
            Line((-REDONDEO1_R * 0.00630597577758, -REDONDEO1_R * 0.02), (REDONDEO1_R * 0.315298788879, -REDONDEO1_R * 0.02))
            Line((REDONDEO1_R * 0.315298788879, -REDONDEO1_R * 0.02), (REDONDEO1_R * 0.315298788879, 0))
        make_face()
    redondeo1_piece_18b = extrude(amount=31.76216133, mode=Mode.PRIVATE)
    redondeo1_piece_18b = split(redondeo1_piece_18b, bisect_by=Plane(origin=(-15.103499013, 29.962685486, -15.588951744), z_dir=(-0.9878735725575741, 0, 0.1552604413311243)), keep=Keep.TOP, mode=Mode.PRIVATE)
    redondeo1_piece_18 = redondeo1_piece_18a & redondeo1_piece_18b
    add(redondeo1_piece_18, mode=Mode.SUBTRACT)
    with BuildSketch(Plane(origin=(15.384788774, 31.300718659, -17.378710415), x_dir=(0.08832475689359764, -0.8224196627964561, -0.5619827715913099), z_dir=(-0.1276892398051722, -0.5688812690234787, 0.8124466504283305))) as redondeo1_piece_19a_section:
        with BuildLine():
            CenterArc((REDONDEO1_R * 0.91458005738, -REDONDEO1_R), REDONDEO1_R, 90, 84.890828744)
            Line((-REDONDEO1_R * 0.0814467660832, -REDONDEO1_R * 0.910946269355), (-REDONDEO1_R * 0.101367302553, -REDONDEO1_R * 0.909165194742))
            Line((-REDONDEO1_R * 0.101367302553, -REDONDEO1_R * 0.909165194742), (-REDONDEO1_R * 0.0182916011476, REDONDEO1_R * 0.02))
            Line((-REDONDEO1_R * 0.0182916011476, REDONDEO1_R * 0.02), (REDONDEO1_R * 0.91458005738, REDONDEO1_R * 0.02))
            Line((REDONDEO1_R * 0.91458005738, REDONDEO1_R * 0.02), (REDONDEO1_R * 0.91458005738, 0))
        make_face()
    redondeo1_piece_19a = extrude(amount=11.955811676, mode=Mode.PRIVATE)
    redondeo1_piece_19a = split(redondeo1_piece_19a, bisect_by=Plane(origin=(15.046076432, 30, -16.662987381), z_dir=(0, 1, 0)), keep=Keep.TOP, mode=Mode.PRIVATE)
    with BuildSketch(Plane(origin=(-15.881080665, 30, -15.521091654), x_dir=(0, -0.573576436351271, 0.8191520442888343), z_dir=(1, 0, 0))) as redondeo1_piece_19b_section:
        with BuildLine():
            CenterArc((REDONDEO1_R * 0.315298788879, REDONDEO1_R), REDONDEO1_R, 235, 35)
            Line((-REDONDEO1_R * 0.258277647472, REDONDEO1_R * 0.180847955711), (-REDONDEO1_R * 0.269749176199, REDONDEO1_R * 0.164464914825))
            Line((-REDONDEO1_R * 0.269749176199, REDONDEO1_R * 0.164464914825), (-REDONDEO1_R * 0.00630597577758, -REDONDEO1_R * 0.02))
            Line((-REDONDEO1_R * 0.00630597577758, -REDONDEO1_R * 0.02), (REDONDEO1_R * 0.315298788879, -REDONDEO1_R * 0.02))
            Line((REDONDEO1_R * 0.315298788879, -REDONDEO1_R * 0.02), (REDONDEO1_R * 0.315298788879, 0))
        make_face()
    redondeo1_piece_19b = extrude(amount=31.76216133, mode=Mode.PRIVATE)
    redondeo1_piece_19b = split(redondeo1_piece_19b, bisect_by=Plane(origin=(15.103499013, 29.962685486, -15.588951744), z_dir=(0.9878735725575741, 0, 0.1552604413311243)), keep=Keep.TOP, mode=Mode.PRIVATE)
    redondeo1_piece_19 = redondeo1_piece_19a & redondeo1_piece_19b
    add(redondeo1_piece_19, mode=Mode.SUBTRACT)
    with BuildSketch(Plane(origin=(-14.538266453, 25.8, -11.992553957), x_dir=(0, -1, 0), z_dir=(0.15526044133112413, 0, 0.9878735725575741))) as redondeo1_piece_20a_section:
        with BuildLine():
            CenterArc((REDONDEO1_R, REDONDEO1_R), REDONDEO1_R, 180, 90)
            Line((0, REDONDEO1_R), (-REDONDEO1_R * 0.02, REDONDEO1_R))
            Line((-REDONDEO1_R * 0.02, REDONDEO1_R), (-REDONDEO1_R * 0.02, -REDONDEO1_R * 0.02))
            Line((-REDONDEO1_R * 0.02, -REDONDEO1_R * 0.02), (REDONDEO1_R, -REDONDEO1_R * 0.02))
            Line((REDONDEO1_R, -REDONDEO1_R * 0.02), (REDONDEO1_R, 0))
        make_face()
    redondeo1_piece_20a = extrude(amount=14.104344788, mode=Mode.PRIVATE)
    redondeo1_piece_20a = split(redondeo1_piece_20a, bisect_by=Plane(origin=(-14.1012205, 26.222998713, -10.126974795), z_dir=(0, -0.8191520442888341, -0.5735764363512712)), keep=Keep.TOP, mode=Mode.PRIVATE)
    with BuildSketch(Plane(origin=(-13.858160269, 24.499281341, -7.665251265), x_dir=(-0.08832475689359706, -0.8224196627964561, -0.5619827715913099), z_dir=(-0.1276892398051722, 0.5688812690234787, -0.8124466504283305))) as redondeo1_piece_20b_section:
        with BuildLine():
            CenterArc((REDONDEO1_R * 0.91458005738, -REDONDEO1_R), REDONDEO1_R, 90, 84.890828744)
            Line((-REDONDEO1_R * 0.0814467660832, -REDONDEO1_R * 0.910946269355), (-REDONDEO1_R * 0.101367302552, -REDONDEO1_R * 0.909165194742))
            Line((-REDONDEO1_R * 0.101367302552, -REDONDEO1_R * 0.909165194742), (-REDONDEO1_R * 0.0182916011476, REDONDEO1_R * 0.02))
            Line((-REDONDEO1_R * 0.0182916011476, REDONDEO1_R * 0.02), (REDONDEO1_R * 0.91458005738, REDONDEO1_R * 0.02))
            Line((REDONDEO1_R * 0.91458005738, REDONDEO1_R * 0.02), (REDONDEO1_R * 0.91458005738, 0))
        make_face()
    redondeo1_piece_20b = extrude(amount=11.955811676, mode=Mode.PRIVATE)
    redondeo1_piece_20b = split(redondeo1_piece_20b, bisect_by=Plane(origin=(-13.85557718, 25.8, -8.86674541), z_dir=(0, -1, 0)), keep=Keep.TOP, mode=Mode.PRIVATE)
    redondeo1_piece_20 = redondeo1_piece_20a & redondeo1_piece_20b
    add(redondeo1_piece_20, mode=Mode.SUBTRACT)
    with BuildSketch(Plane(origin=(12.348419657, 25.8, 1.940755517), x_dir=(-0.987873572557574, 0, -0.15526044133112424), z_dir=(0.15526044133112424, 0, -0.9878735725575741))) as redondeo1_piece_21a_section:
        with BuildLine():
            CenterArc((REDONDEO1_R, -REDONDEO1_R), REDONDEO1_R, 90, 90)
            Line((0, -REDONDEO1_R), (-REDONDEO1_R * 0.02, -REDONDEO1_R))
            Line((-REDONDEO1_R * 0.02, -REDONDEO1_R), (-REDONDEO1_R * 0.02, REDONDEO1_R * 0.02))
            Line((-REDONDEO1_R * 0.02, REDONDEO1_R * 0.02), (REDONDEO1_R, REDONDEO1_R * 0.02))
            Line((REDONDEO1_R, REDONDEO1_R * 0.02), (REDONDEO1_R, 0))
        make_face()
    redondeo1_piece_21a = extrude(amount=14.104344788, mode=Mode.PRIVATE)
    redondeo1_piece_21a = split(redondeo1_piece_21a, bisect_by=Plane(origin=(14.1012205, 26.222998713, -10.126974795), z_dir=(0, -0.8191520442888341, -0.5735764363512712)), keep=Keep.TOP, mode=Mode.PRIVATE)
    with BuildSketch(Plane(origin=(15.384788774, 31.300718659, -17.378710415), x_dir=(0.08832475689359764, -0.8224196627964561, -0.5619827715913099), z_dir=(-0.1276892398051722, -0.5688812690234787, 0.8124466504283305))) as redondeo1_piece_21b_section:
        with BuildLine():
            CenterArc((REDONDEO1_R * 0.91458005738, -REDONDEO1_R), REDONDEO1_R, 90, 84.890828744)
            Line((-REDONDEO1_R * 0.0814467660832, -REDONDEO1_R * 0.910946269355), (-REDONDEO1_R * 0.101367302553, -REDONDEO1_R * 0.909165194742))
            Line((-REDONDEO1_R * 0.101367302553, -REDONDEO1_R * 0.909165194742), (-REDONDEO1_R * 0.0182916011476, REDONDEO1_R * 0.02))
            Line((-REDONDEO1_R * 0.0182916011476, REDONDEO1_R * 0.02), (REDONDEO1_R * 0.91458005738, REDONDEO1_R * 0.02))
            Line((REDONDEO1_R * 0.91458005738, REDONDEO1_R * 0.02), (REDONDEO1_R * 0.91458005738, 0))
        make_face()
    redondeo1_piece_21b = extrude(amount=11.955811676, mode=Mode.PRIVATE)
    redondeo1_piece_21b = split(redondeo1_piece_21b, bisect_by=Plane(origin=(13.85557718, 25.8, -8.86674541), z_dir=(0, -1, 0)), keep=Keep.TOP, mode=Mode.PRIVATE)
    redondeo1_piece_21 = redondeo1_piece_21a & redondeo1_piece_21b
    add(redondeo1_piece_21, mode=Mode.SUBTRACT)


solid = part.part
